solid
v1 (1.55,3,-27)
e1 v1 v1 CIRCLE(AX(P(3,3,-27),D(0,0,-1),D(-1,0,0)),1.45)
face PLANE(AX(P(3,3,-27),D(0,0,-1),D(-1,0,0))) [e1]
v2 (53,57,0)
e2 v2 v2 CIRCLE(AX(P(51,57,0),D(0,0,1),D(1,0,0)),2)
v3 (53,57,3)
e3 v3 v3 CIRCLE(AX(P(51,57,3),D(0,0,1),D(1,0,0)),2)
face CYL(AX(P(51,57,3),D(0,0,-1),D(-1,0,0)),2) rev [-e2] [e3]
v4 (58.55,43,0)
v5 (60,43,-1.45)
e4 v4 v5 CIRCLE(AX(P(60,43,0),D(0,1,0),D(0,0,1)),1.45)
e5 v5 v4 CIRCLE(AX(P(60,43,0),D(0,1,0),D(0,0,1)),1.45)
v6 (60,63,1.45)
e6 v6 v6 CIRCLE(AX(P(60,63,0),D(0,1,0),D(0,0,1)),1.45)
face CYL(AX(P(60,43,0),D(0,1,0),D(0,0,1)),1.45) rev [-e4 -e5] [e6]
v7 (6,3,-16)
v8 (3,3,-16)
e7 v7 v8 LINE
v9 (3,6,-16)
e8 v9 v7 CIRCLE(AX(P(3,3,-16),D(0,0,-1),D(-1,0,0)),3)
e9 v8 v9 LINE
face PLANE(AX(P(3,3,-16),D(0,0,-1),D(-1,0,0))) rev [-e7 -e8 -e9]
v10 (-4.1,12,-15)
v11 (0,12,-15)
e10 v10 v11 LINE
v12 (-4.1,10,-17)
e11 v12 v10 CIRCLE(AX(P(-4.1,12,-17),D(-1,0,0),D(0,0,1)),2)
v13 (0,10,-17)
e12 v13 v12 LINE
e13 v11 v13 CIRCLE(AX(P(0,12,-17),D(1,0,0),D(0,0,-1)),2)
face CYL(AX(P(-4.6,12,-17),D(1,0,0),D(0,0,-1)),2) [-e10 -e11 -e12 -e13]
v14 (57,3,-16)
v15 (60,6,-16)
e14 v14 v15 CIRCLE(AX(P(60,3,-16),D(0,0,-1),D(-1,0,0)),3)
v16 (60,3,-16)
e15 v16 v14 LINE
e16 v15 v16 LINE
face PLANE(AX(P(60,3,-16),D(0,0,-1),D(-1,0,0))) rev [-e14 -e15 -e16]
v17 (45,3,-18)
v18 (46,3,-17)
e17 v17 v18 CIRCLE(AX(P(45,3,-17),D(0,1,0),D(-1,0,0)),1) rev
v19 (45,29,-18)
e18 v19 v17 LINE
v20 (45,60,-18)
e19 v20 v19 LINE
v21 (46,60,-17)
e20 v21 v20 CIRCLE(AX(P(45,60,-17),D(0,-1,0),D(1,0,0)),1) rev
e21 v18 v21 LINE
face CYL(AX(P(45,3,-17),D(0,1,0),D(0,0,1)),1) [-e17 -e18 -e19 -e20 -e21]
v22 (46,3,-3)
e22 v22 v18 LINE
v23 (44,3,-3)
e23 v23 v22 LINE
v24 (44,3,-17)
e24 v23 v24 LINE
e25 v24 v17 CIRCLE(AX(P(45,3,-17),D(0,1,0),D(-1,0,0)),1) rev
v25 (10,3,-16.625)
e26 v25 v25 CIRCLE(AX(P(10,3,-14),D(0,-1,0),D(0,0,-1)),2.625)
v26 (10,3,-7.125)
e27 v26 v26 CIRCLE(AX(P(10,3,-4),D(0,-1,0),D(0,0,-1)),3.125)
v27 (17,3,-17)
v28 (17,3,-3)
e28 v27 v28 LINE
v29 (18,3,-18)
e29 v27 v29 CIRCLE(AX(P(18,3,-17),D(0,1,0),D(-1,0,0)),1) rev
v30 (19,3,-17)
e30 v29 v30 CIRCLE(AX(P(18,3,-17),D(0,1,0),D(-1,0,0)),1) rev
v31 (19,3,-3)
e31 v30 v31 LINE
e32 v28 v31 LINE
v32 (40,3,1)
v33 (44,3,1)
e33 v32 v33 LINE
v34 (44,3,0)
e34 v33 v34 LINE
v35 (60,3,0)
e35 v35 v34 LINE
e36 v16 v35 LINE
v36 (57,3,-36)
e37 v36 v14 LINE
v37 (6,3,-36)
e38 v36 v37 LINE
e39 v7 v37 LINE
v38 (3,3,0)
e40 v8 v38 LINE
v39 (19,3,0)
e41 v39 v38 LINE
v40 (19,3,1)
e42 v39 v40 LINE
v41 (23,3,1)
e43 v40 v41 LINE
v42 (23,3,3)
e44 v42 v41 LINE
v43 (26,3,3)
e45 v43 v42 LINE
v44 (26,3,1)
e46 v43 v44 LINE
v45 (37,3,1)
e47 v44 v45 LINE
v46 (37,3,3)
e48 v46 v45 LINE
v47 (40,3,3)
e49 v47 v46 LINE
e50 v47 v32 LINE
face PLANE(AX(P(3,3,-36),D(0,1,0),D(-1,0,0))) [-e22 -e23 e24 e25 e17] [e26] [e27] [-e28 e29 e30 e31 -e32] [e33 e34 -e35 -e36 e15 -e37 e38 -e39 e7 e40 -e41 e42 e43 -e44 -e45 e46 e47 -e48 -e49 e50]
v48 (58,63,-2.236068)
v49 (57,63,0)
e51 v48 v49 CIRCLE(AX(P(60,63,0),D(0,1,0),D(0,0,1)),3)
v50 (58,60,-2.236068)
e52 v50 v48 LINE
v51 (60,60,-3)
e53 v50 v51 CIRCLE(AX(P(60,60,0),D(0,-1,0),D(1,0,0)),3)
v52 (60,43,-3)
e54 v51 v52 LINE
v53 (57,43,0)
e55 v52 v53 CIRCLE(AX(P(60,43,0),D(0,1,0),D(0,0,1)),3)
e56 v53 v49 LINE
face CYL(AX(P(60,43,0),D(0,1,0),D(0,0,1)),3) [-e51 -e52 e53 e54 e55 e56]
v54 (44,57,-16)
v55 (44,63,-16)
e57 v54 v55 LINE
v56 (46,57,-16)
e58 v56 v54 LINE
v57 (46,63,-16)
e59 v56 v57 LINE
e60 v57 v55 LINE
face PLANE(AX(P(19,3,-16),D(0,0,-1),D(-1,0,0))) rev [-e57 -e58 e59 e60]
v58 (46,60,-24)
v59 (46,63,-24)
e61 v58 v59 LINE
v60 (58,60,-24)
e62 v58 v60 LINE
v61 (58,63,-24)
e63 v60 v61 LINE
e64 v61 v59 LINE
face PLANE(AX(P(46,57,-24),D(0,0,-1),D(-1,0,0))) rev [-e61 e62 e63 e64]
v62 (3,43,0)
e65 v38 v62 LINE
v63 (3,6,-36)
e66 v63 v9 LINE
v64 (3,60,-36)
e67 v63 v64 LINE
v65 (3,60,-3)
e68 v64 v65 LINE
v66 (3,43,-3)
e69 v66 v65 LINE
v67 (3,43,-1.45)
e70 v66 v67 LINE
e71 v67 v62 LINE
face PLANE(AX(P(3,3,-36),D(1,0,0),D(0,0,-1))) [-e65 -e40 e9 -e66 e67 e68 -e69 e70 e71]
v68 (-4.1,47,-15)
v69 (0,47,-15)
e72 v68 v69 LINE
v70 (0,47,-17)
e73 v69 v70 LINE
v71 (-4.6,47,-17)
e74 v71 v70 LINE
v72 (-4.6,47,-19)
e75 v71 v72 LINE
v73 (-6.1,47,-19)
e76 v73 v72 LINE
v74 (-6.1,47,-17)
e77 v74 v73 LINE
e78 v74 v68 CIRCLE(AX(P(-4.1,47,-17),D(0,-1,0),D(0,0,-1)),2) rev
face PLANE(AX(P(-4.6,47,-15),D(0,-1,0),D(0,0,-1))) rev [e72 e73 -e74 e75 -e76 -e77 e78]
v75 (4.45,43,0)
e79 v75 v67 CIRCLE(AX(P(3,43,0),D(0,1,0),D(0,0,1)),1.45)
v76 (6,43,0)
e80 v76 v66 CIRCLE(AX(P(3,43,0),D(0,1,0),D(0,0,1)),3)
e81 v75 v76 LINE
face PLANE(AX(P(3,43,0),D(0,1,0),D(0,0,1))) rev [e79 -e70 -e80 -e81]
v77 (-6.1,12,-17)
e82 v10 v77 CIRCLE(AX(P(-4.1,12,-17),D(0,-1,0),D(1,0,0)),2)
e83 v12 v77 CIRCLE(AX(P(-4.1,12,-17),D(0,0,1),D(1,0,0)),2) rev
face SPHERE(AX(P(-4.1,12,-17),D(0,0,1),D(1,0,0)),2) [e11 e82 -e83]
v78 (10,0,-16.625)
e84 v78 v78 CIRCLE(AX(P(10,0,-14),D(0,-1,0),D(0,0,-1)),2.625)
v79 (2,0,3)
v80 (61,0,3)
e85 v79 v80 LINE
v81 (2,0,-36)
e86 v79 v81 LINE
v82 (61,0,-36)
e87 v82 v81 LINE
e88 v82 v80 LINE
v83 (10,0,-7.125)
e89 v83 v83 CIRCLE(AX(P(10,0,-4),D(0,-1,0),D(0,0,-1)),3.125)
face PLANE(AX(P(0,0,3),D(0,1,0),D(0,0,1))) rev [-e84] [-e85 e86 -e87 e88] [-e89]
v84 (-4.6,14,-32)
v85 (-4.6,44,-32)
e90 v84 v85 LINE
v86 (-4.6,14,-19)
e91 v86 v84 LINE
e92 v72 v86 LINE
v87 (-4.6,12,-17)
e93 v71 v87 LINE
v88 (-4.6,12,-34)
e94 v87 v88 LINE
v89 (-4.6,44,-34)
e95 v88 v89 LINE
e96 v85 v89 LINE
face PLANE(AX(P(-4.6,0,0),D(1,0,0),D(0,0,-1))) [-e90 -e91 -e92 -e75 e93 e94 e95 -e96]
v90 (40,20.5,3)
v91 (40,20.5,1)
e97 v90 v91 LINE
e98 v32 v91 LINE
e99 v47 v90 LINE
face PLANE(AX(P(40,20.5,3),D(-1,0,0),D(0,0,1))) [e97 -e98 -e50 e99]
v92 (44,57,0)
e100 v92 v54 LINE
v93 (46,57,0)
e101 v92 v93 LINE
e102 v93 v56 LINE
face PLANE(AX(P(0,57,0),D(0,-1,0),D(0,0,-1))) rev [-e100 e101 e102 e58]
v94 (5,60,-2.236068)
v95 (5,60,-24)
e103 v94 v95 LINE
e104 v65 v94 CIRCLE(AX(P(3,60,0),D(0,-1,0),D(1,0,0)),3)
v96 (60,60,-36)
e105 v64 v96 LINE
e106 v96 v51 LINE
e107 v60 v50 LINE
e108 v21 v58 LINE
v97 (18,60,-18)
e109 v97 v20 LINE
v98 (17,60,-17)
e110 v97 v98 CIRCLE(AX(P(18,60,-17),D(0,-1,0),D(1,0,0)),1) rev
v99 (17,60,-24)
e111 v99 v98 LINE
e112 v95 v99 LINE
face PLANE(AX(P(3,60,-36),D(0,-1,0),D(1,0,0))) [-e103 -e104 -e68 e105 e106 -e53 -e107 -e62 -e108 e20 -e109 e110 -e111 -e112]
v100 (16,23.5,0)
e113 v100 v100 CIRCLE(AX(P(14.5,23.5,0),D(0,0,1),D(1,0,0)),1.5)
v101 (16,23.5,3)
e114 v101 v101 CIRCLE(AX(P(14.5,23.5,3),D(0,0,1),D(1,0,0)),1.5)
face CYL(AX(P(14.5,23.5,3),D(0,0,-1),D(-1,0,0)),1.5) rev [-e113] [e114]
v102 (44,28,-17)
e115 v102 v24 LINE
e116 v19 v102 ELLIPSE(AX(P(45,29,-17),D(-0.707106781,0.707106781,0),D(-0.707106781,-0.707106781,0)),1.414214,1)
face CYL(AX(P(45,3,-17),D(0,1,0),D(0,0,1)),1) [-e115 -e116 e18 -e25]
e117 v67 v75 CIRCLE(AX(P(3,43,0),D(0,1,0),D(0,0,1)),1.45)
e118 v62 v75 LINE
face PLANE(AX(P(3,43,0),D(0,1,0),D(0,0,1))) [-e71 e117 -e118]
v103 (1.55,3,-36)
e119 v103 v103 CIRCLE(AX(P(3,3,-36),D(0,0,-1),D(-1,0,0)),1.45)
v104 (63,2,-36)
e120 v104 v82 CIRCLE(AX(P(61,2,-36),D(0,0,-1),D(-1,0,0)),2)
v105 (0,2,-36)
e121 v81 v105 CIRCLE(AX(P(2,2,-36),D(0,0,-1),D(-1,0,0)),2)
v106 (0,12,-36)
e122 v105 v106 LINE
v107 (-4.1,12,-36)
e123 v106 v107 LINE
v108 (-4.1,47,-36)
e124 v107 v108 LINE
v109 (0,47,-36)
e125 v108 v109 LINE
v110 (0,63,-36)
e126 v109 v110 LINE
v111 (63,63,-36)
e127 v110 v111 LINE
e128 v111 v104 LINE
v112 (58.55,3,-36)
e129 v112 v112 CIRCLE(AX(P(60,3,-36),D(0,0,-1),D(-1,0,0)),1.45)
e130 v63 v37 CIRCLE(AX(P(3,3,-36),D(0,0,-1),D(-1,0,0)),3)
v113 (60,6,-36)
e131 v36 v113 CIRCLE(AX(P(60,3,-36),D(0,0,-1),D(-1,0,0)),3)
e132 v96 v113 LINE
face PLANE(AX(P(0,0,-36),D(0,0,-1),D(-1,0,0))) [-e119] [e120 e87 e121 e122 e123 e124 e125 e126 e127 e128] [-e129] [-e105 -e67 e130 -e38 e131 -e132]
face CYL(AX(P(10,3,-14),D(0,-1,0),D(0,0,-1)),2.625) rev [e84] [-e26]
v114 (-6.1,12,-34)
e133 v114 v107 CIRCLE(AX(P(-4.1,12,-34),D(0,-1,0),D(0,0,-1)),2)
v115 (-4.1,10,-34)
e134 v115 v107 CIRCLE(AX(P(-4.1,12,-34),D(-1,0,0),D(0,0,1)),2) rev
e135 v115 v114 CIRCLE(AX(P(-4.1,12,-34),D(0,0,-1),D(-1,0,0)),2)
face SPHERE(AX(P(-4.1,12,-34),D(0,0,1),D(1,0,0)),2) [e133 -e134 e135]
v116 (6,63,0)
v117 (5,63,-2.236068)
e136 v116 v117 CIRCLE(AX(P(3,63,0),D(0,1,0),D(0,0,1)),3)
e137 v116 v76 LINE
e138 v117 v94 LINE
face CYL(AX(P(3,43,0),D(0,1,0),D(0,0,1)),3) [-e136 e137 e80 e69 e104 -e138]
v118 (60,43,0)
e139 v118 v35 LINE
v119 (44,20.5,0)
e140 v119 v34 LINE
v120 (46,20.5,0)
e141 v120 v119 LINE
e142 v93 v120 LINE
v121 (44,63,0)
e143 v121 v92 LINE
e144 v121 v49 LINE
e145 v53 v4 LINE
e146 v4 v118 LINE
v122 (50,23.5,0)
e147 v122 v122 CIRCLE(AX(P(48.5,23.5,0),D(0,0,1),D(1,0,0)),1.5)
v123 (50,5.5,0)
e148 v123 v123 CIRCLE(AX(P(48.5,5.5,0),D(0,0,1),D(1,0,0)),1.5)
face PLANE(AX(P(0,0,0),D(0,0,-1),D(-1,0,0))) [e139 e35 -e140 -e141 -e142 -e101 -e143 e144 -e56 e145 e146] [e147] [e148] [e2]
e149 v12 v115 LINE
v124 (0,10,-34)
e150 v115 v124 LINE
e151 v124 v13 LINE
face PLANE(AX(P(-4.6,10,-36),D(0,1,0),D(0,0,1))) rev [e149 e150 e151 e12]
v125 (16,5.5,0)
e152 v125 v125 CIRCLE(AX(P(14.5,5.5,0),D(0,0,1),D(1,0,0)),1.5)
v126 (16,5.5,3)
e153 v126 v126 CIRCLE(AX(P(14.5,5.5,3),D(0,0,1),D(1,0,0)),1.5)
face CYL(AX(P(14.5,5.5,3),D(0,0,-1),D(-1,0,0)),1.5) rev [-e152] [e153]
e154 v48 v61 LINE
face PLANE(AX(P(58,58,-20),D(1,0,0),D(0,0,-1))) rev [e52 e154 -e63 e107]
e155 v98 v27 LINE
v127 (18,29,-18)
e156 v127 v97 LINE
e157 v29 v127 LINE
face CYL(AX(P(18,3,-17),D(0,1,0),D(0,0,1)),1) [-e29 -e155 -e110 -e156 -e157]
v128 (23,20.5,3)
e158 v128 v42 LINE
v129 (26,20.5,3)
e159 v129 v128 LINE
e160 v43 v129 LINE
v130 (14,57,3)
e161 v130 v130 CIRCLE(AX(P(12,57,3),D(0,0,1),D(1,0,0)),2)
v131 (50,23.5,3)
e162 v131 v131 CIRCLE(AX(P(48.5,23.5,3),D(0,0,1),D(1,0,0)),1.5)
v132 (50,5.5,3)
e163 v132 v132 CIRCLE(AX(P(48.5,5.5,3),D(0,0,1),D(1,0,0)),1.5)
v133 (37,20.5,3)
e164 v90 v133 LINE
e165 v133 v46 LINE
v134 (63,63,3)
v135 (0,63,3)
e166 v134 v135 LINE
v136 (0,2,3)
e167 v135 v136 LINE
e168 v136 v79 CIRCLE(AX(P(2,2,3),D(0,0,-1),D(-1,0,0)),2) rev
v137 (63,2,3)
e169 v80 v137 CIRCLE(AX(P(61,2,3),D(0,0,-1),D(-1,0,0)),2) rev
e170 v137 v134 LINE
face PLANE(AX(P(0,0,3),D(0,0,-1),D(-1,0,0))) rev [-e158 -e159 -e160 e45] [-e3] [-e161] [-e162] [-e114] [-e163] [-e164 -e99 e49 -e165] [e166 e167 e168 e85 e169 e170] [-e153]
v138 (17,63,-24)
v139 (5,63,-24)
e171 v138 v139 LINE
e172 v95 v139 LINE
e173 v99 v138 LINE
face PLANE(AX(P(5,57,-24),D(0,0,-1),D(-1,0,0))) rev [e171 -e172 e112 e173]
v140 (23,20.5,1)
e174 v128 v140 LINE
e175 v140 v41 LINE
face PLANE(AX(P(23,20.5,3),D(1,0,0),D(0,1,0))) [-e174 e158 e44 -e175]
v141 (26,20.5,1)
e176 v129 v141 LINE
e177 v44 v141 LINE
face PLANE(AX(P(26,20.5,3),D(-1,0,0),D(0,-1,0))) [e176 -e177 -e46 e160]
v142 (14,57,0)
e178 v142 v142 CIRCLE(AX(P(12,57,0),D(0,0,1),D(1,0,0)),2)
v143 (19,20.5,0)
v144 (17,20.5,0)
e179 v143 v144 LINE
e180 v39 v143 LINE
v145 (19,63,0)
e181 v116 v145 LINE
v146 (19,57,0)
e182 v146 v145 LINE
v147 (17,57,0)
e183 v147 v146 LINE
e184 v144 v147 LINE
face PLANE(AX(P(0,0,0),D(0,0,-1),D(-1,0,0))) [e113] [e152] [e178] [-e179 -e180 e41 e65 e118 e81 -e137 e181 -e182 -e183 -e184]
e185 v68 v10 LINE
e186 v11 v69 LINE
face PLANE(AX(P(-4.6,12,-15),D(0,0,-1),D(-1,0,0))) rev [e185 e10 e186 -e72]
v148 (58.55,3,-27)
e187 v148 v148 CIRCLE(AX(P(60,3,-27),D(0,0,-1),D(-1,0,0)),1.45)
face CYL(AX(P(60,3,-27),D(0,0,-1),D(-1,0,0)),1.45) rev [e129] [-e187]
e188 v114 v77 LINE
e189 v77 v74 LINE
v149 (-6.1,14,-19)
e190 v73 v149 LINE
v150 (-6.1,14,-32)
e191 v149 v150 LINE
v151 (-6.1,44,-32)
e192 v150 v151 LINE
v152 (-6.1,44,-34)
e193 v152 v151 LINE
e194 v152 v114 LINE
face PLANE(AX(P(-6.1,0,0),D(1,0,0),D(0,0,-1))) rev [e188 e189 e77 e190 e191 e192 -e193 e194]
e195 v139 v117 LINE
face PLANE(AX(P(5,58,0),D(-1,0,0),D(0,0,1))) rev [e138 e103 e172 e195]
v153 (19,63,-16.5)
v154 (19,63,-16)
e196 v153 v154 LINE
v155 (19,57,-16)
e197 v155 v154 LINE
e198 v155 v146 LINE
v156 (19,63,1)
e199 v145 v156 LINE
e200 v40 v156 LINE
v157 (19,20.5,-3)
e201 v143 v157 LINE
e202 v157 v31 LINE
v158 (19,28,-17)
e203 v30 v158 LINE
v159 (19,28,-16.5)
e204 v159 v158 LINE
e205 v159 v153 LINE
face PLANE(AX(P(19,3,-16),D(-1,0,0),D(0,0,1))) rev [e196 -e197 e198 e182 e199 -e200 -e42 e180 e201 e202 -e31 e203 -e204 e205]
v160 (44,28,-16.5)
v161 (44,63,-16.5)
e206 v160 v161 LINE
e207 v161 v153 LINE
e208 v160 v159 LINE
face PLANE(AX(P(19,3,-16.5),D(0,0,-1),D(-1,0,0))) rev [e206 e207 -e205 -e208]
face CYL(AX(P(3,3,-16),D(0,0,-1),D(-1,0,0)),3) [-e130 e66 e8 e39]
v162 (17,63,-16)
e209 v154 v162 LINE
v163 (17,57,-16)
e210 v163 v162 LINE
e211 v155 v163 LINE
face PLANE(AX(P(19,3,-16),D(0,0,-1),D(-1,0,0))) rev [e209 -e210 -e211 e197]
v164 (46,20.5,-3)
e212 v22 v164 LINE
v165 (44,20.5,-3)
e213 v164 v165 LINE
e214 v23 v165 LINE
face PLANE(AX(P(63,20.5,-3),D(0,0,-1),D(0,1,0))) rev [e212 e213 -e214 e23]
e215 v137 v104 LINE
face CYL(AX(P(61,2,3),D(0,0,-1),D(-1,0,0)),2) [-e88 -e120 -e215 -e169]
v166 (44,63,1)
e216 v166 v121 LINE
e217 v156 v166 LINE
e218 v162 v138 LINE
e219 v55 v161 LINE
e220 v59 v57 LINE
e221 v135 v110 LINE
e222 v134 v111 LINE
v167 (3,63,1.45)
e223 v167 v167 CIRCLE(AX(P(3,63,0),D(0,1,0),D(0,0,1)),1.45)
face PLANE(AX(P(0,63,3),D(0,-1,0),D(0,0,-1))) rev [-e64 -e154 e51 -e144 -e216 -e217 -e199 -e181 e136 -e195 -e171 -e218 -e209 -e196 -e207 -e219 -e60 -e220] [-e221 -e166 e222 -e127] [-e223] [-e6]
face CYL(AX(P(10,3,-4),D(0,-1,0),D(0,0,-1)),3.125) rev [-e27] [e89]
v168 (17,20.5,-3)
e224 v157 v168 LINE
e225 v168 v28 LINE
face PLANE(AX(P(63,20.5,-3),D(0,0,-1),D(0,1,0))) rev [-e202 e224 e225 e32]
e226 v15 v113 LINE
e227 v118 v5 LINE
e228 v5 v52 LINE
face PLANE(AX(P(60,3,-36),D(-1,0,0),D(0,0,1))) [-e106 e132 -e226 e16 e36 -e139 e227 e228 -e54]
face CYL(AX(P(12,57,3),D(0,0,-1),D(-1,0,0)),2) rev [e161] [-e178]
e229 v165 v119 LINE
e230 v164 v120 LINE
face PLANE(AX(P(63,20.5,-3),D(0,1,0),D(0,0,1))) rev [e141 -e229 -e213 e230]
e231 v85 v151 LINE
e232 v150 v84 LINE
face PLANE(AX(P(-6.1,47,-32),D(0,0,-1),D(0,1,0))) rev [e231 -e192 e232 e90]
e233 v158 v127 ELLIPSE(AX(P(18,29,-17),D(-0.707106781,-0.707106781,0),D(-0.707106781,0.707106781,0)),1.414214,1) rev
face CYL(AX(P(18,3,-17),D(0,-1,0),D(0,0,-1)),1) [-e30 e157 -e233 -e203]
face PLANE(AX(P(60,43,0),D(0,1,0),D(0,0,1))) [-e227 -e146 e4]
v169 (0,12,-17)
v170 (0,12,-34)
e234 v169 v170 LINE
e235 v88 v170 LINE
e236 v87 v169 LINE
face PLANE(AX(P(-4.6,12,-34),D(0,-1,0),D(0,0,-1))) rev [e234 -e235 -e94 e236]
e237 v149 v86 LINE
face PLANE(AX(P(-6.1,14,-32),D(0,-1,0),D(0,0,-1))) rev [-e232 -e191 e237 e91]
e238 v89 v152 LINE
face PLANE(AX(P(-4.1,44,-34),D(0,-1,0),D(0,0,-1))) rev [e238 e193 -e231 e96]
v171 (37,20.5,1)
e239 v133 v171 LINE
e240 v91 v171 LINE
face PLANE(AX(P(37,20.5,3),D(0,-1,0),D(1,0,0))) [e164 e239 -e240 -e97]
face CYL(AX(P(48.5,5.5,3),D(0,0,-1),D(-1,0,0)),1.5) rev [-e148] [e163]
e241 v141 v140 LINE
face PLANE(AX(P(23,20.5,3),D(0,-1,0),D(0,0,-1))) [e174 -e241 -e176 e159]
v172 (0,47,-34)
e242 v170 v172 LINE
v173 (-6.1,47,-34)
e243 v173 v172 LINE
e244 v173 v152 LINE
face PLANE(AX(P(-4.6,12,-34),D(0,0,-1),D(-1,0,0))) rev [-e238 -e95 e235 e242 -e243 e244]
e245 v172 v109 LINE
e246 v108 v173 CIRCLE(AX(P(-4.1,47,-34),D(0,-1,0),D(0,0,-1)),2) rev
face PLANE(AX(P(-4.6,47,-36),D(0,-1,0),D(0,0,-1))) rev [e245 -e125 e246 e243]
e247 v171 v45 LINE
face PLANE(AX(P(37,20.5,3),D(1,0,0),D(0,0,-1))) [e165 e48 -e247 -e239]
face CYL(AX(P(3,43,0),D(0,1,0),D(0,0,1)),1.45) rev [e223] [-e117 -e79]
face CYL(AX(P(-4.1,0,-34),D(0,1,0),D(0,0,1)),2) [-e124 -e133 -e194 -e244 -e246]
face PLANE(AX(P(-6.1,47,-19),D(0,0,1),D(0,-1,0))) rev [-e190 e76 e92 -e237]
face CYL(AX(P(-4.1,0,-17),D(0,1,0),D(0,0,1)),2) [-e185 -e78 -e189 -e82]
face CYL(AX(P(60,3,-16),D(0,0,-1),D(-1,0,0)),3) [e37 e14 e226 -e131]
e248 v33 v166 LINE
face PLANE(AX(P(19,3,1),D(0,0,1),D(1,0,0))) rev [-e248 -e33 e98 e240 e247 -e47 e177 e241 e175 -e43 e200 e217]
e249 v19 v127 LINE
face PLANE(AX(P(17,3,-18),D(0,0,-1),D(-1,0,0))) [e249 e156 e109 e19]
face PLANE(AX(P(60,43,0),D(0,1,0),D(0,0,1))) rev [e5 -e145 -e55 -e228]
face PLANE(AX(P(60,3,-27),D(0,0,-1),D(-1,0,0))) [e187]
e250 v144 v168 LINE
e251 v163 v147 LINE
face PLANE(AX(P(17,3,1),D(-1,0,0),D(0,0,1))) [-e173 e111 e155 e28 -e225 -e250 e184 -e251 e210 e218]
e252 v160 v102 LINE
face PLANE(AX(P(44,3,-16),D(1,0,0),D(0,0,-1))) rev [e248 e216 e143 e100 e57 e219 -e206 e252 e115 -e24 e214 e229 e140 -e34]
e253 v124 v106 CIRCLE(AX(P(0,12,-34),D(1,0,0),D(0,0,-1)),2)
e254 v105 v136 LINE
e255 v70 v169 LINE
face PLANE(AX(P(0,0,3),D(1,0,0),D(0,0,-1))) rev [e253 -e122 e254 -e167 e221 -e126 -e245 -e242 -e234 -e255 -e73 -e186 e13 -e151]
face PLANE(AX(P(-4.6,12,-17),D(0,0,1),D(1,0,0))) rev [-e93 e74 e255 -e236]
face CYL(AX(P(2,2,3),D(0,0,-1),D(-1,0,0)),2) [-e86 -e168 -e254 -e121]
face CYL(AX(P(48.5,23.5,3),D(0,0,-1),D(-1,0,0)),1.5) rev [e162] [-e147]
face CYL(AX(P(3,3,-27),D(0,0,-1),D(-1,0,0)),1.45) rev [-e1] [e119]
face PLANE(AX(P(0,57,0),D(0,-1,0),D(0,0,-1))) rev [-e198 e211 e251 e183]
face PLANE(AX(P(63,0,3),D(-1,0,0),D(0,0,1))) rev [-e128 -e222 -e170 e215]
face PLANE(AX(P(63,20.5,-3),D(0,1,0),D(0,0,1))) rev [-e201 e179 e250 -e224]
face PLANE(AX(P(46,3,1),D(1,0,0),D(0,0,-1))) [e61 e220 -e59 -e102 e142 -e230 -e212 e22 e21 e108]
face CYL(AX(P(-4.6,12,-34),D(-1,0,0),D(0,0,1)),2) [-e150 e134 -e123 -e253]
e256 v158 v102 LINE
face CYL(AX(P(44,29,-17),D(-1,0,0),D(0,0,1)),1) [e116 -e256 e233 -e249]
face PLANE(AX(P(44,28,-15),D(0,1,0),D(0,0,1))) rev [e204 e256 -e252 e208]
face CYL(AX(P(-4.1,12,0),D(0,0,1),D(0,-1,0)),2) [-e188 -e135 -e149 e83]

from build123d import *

# Parameters (mm, degrees)
CROQUIS1_W               = 63
CROQUIS1_H               = 63
CROQUIS1_R               = 2
CROQUIS1_R_2             = 1.5
CROQUIS1_W_2             = 3
CROQUIS1_H_2             = 12
SALIENTE_EXTRUIR1_DEPTH  = 3
CROQUIS2_W               = 63
CROQUIS2_H               = 63
CROQUIS2_W_2             = 57
CROQUIS2_H_2             = 57
SALIENTE_EXTRUIR2_DEPTH  = 36
CROQUIS4_W               = 25
CROQUIS4_H               = 17
CORTAR_EXTRUIR2_DEPTH    = 60
SALIENTE_EXTRUIR8_DEPTH  = 60
CROQUIS8_W               = 3
CROQUIS8_H               = 12
CORTAR_EXTRUIR4_DEPTH    = 63
CROQUIS10_R              = 3
SALIENTE_EXTRUIR6_DEPTH  = 20
CROQUIS11_R              = 1.45
CORTAR_EXTRUIR6_DEPTH    = 9
REDONDEO1_R              = 2
CROQUIS13_W              = 25
CROQUIS13_H              = 25
CORTAR_EXTRUIR7_DEPTH    = 3
CROQUIS14_W              = 12
CROQUIS14_H              = 20
CORTAR_EXTRUIR8_DEPTH    = 5
CROQUIS15_R              = 3
SALIENTE_EXTRUIR9_DEPTH  = 20
CROQUIS16_W              = 15
CROQUIS16_H              = 18
SALIENTE_EXTRUIR10_DEPTH = 8
CROQUIS17_R              = 1.45
CORTAR_EXTRUIR9_DEPTH    = 20
CROQUIS18_W              = 3
CROQUIS18_H              = 12
SALIENTE_EXTRUIR11_DEPTH = 3
CROQUIS19_W              = 3
CROQUIS19_H              = 12
SALIENTE_EXTRUIR12_DEPTH = 3
REDONDEO3_R              = 1
CROQUIS20_R              = 3.125
CROQUIS20_R_2            = 2.625
CORTAR_EXTRUIR10_DEPTH   = 3
CROQUIS21_W              = 18.835847929
CROQUIS21_H              = 19.895765468
CORTAR_EXTRUIR11_DEPTH   = 18
CROQUIS22_R              = 1.45
SALIENTE_EXTRUIR13_DEPTH = 3
CROQUIS23_W              = 29
CROQUIS23_H              = 16
CORTAR_EXTRUIR12_DEPTH   = 6
CROQUIS24_W              = 3
CROQUIS24_H              = 5.5
CORTAR_EXTRUIR13_DEPTH   = 6
CROQUIS25_W              = 3
CROQUIS25_H              = 5.5
CORTAR_EXTRUIR14_DEPTH   = 30
CROQUIS26_W              = 25
CROQUIS26_H              = 0.5
CORTAR_EXTRUIR15_DEPTH   = 60
CROQUIS28_W              = 12
CROQUIS28_H              = 4
CORTAR_EXTRUIR16_DEPTH   = 6
SALIENTE_EXTRUIR14_DEPTH = 4.6
SALIENTE_EXTRUIR15_DEPTH = 1.5
REDONDEO4_R              = 2
CROQUIS31_W              = 2
CROQUIS31_H              = 3
CORTAR_EXTRUIR17_DEPTH   = 2


with BuildPart() as part:
    # Croquis1 → Saliente-Extruir1 (new body)
    with BuildSketch(Plane.XY):
        with Locations((31.5, 31.5)):
            Rectangle(CROQUIS1_W, CROQUIS1_H)
        with Locations((12, 57)):
            Circle(CROQUIS1_R, mode=Mode.SUBTRACT)
        with Locations((51, 57)):
            Circle(CROQUIS1_R, mode=Mode.SUBTRACT)
        with Locations((14.5, 5.5)):
            Circle(CROQUIS1_R_2, mode=Mode.SUBTRACT)
        with Locations((14.5, 23.5)):
            Circle(CROQUIS1_R_2, mode=Mode.SUBTRACT)
        with Locations((48.5, 5.5)):
            Circle(CROQUIS1_R_2, mode=Mode.SUBTRACT)
        with Locations((48.5, 23.5)):
            Circle(CROQUIS1_R_2, mode=Mode.SUBTRACT)
        with Locations((24.5, 14.5)):
            Rectangle(CROQUIS1_W_2, CROQUIS1_H_2, mode=Mode.SUBTRACT)
        with Locations((38.5, 14.5)):
            Rectangle(CROQUIS1_W_2, CROQUIS1_H_2, mode=Mode.SUBTRACT)
    extrude(amount=SALIENTE_EXTRUIR1_DEPTH)

    # Croquis2 → Saliente-Extruir2 (add)
    with BuildSketch(Plane(origin=(0, 0, 0), x_dir=(-1, 0, 0), z_dir=(0, 0, -1))):
        with Locations((-31.5, 31.5)):
            Rectangle(CROQUIS2_W, CROQUIS2_H)
        with Locations((-31.5, 31.5)):
            Rectangle(CROQUIS2_W_2, CROQUIS2_H_2, mode=Mode.SUBTRACT)
    extrude(amount=SALIENTE_EXTRUIR2_DEPTH)

    # Croquis4 → Cortar-Extruir2 (cut)
    with BuildSketch(Plane(origin=(0, 63, 0), x_dir=(1, 0, 0), z_dir=(0, 1, 0))):
        with Locations((31.5, 7.5)):
            Rectangle(CROQUIS4_W, CROQUIS4_H)
    extrude(amount=-CORTAR_EXTRUIR2_DEPTH, mode=Mode.SUBTRACT)

    # Croquis12 → Saliente-Extruir8 (add)
    with BuildSketch(Plane(origin=(0, 63, 0), x_dir=(1, 0, 0), z_dir=(0, 1, 0))):
        Polygon((19, -1), (17, -1), (17, 18), (46, 18), (46, -1), (44, -1), (44, 16), (19, 16), align=None)
    extrude(amount=-SALIENTE_EXTRUIR8_DEPTH)

    # Croquis8 → Cortar-Extruir4 (cut)
    with BuildSketch(Plane.ZY):
        with Locations((-1.5, 14.5)):
            Rectangle(CROQUIS8_W, CROQUIS8_H)
    extrude(amount=-CORTAR_EXTRUIR4_DEPTH, mode=Mode.SUBTRACT)

    # Croquis10 → Saliente-Extruir6 (add)
    with BuildSketch(Plane(origin=(0, 0, -36), x_dir=(-1, 0, 0), z_dir=(0, 0, -1))):
        with Locations((-3, 3)):
            Circle(CROQUIS10_R)
        with Locations((-60, 3)):
            Circle(CROQUIS10_R)
    extrude(amount=-SALIENTE_EXTRUIR6_DEPTH)

    # Croquis11 → Cortar-Extruir6 (cut)
    with BuildSketch(Plane(origin=(0, 0, -36), x_dir=(-1, 0, 0), z_dir=(0, 0, -1))):
        with Locations((-60, 3)):
            Circle(CROQUIS11_R)
        with Locations((-3, 3)):
            Circle(CROQUIS11_R)
    extrude(amount=-CORTAR_EXTRUIR6_DEPTH, mode=Mode.SUBTRACT)

    # Redondeo1
    redondeo1_edges = [part.edges().sort_by_distance(p)[0] for p in [
        (63, 0, -16.5),
        (0, 0, -16.5),
    ]]
    fillet(redondeo1_edges, radius=REDONDEO1_R)

    # Croquis13 → Cortar-Extruir7 (cut)
    with BuildSketch(Plane(origin=(0, 0, -18), x_dir=(-1, 0, 0), z_dir=(0, 0, -1))):
        with Locations((-31.5, 15.5)):
            Rectangle(CROQUIS13_W, CROQUIS13_H)
    extrude(amount=-CORTAR_EXTRUIR7_DEPTH, mode=Mode.SUBTRACT)

    # Croquis14 → Cortar-Extruir8 (cut)
    with BuildSketch(Plane(origin=(0, 63, 0), x_dir=(1, 0, 0), z_dir=(0, 1, 0))):
        with Locations((52, 10)):
            Rectangle(CROQUIS14_W, CROQUIS14_H)
        with Locations((11, 10)):
            Rectangle(CROQUIS14_W, CROQUIS14_H)
    extrude(amount=-CORTAR_EXTRUIR8_DEPTH, mode=Mode.SUBTRACT)

    # Croquis15 → Saliente-Extruir9 (add)
    with BuildSketch(Plane(origin=(0, 63, 0), x_dir=(1, 0, 0), z_dir=(0, 1, 0))):
        with Locations((3, 0)):
            Circle(CROQUIS15_R)
        with Locations((60, 0)):
            Circle(CROQUIS15_R)
        with Locations(Location((31.5, 31, 0), (0, 0, 270))):
            Circle(CROQUIS15_R)
    extrude(amount=-SALIENTE_EXTRUIR9_DEPTH)

    # Croquis16 → Saliente-Extruir10 (add)
    with BuildSketch(Plane.XZ.offset(-60)):
        with Locations((31.5, -27)):
            Rectangle(CROQUIS16_W, CROQUIS16_H)
    extrude(amount=SALIENTE_EXTRUIR10_DEPTH)

    # Croquis17 → Cortar-Extruir9 (cut)
    with BuildSketch(Plane(origin=(0, 63, 0), x_dir=(1, 0, 0), z_dir=(0, 1, 0))):
        with Locations(Location((3, 0, 0), (0, 0, 270))):
            Circle(CROQUIS17_R)
        with Locations(Location((60, 0, 0), (0, 0, 270))):
            Circle(CROQUIS17_R)
        with Locations(Location((31.5, 31, 0), (0, 0, 270))):
            Circle(CROQUIS17_R)
    extrude(amount=-CORTAR_EXTRUIR9_DEPTH, mode=Mode.SUBTRACT)

    # Croquis18 → Saliente-Extruir11 (add)
    with BuildSketch(Plane(origin=(63, 0, 0), x_dir=(0, 0, -1), z_dir=(1, 0, 0))):
        with Locations((1.5, 14.5)):
            Rectangle(CROQUIS18_W, CROQUIS18_H)
    extrude(amount=-SALIENTE_EXTRUIR11_DEPTH)

    # Croquis19 → Saliente-Extruir12 (add)
    with BuildSketch(Plane.ZY):
        with Locations((-1.5, 14.5)):
            Rectangle(CROQUIS19_W, CROQUIS19_H)
    extrude(amount=-SALIENTE_EXTRUIR12_DEPTH)

    # Redondeo3
    redondeo3_edges = [part.edges().sort_by_distance(p)[0] for p in [
        (31.5, 28, -18),
        (44, 15.5, -18),
        (19, 15.5, -18),
        (46, 31.5, -18),
        (17, 31.5, -18),
        (39, 52, -27),
        (24, 52, -27),
        (39, 56, -36),
        (24, 56, -36),
        (31.5, 52, -36),
    ]]
    fillet(redondeo3_edges, radius=REDONDEO3_R - 0.0001)  # a hair under: the kernel refuses the full size

    # Croquis20 → Cortar-Extruir10 (cut)
    with BuildSketch(Plane.XZ):
        with Locations(Location((10, -4, 0), (0, 0, 270))):
            Circle(CROQUIS20_R)
        with Locations(Location((10, -14, 0), (0, 0, 270))):
            Circle(CROQUIS20_R_2)
    extrude(amount=-CORTAR_EXTRUIR10_DEPTH, mode=Mode.SUBTRACT)

    # Croquis21 → Cortar-Extruir11 (cut)
    with BuildSketch(Plane(origin=(0, 0, -36), x_dir=(-1, 0, 0), z_dir=(0, 0, -1))):
        with Locations((-31.895496214, 50.052117266)):
            Rectangle(CROQUIS21_W, CROQUIS21_H)
    extrude(amount=-CORTAR_EXTRUIR11_DEPTH, mode=Mode.SUBTRACT)

    # Croquis22 → Saliente-Extruir13 (add)
    with BuildSketch(Plane(origin=(0, 63, 0), x_dir=(1, 0, 0), z_dir=(0, 1, 0))):
        with Locations((31.5, 31)):
            Circle(CROQUIS22_R)
    extrude(amount=-SALIENTE_EXTRUIR13_DEPTH)

    # Croquis23 → Cortar-Extruir12 (cut)
    with BuildSketch(Plane(origin=(0, 63, 0), x_dir=(1, 0, 0), z_dir=(0, 1, 0))):
        with Locations((31.5, 8)):
            Rectangle(CROQUIS23_W, CROQUIS23_H)
    extrude(amount=-CORTAR_EXTRUIR12_DEPTH, mode=Mode.SUBTRACT)

    # Croquis24 → Cortar-Extruir13 (cut)
    with BuildSketch(Plane(origin=(0, 0, 1), x_dir=(-1, 0, 0), z_dir=(0, 0, -1))):
        with Locations((-38.5, 5.75)):
            Rectangle(CROQUIS24_W, CROQUIS24_H)
        with Locations((-24.5, 5.75)):
            Rectangle(CROQUIS24_W, CROQUIS24_H)
    extrude(amount=-CORTAR_EXTRUIR13_DEPTH, mode=Mode.SUBTRACT)

    # Croquis25 → Cortar-Extruir14 (cut)
    with BuildSketch(Plane(origin=(46, 0, 0), x_dir=(0, 0, -1), z_dir=(1, 0, 0))):
        with Locations((1.5, 5.75)):
            Rectangle(CROQUIS25_W, CROQUIS25_H)
    extrude(amount=-CORTAR_EXTRUIR14_DEPTH, mode=Mode.SUBTRACT)

    # Croquis26 → Cortar-Extruir15 (cut)
    with BuildSketch(Plane(origin=(0, 63, 0), x_dir=(1, 0, 0), z_dir=(0, 1, 0))):
        with Locations((31.5, 16.25)):
            Rectangle(CROQUIS26_W, CROQUIS26_H)
    extrude(amount=-CORTAR_EXTRUIR15_DEPTH, mode=Mode.SUBTRACT)

    # Croquis28 → Cortar-Extruir16 (cut)
    with BuildSketch(Plane(origin=(0, 63, 0), x_dir=(1, 0, 0), z_dir=(0, 1, 0))):
        with Locations((11, 22)):
            Rectangle(CROQUIS28_W, CROQUIS28_H)
        with Locations((52, 22)):
            Rectangle(CROQUIS28_W, CROQUIS28_H)
    extrude(amount=-CORTAR_EXTRUIR16_DEPTH, mode=Mode.SUBTRACT)

    # Croquis29 → Saliente-Extruir14 (add)
    with BuildSketch(Plane.ZY):
        Polygon((-36, 10), (-15, 10), (-15, 12), (-15, 47), (-17, 47), (-17, 12), (-34, 12), (-34, 47), (-36, 47), (-36, 12), align=None)
    extrude(amount=SALIENTE_EXTRUIR14_DEPTH)

    # Croquis30 → Saliente-Extruir15 (add)
    with BuildSketch(Plane.ZY.offset(4.6)):
        Polygon((-36, 10), (-15, 10), (-15, 14), (-15, 47), (-19, 47), (-19, 14), (-32, 14), (-32, 47), (-36, 47), (-36, 14), align=None)
    extrude(amount=SALIENTE_EXTRUIR15_DEPTH)

    # Redondeo4
    redondeo4_edges = [part.edges().sort_by_distance(p)[0] for p in [
        (-3.05, 10, -36),
        (-3.05, 10, -15),
        (-6.1, 28.5, -36),
        (-6.1, 10, -25.5),
        (-6.1, 28.5, -15),
    ]]
    fillet(redondeo4_edges, radius=REDONDEO4_R)

    # Croquis31 → Cortar-Extruir17 (cut)
    with BuildSketch(Plane.ZY.offset(6.1)):
        with Locations((-33, 45.5)):
            Rectangle(CROQUIS31_W, CROQUIS31_H)
    extrude(amount=-CORTAR_EXTRUIR17_DEPTH, mode=Mode.SUBTRACT)


solid = part.part
